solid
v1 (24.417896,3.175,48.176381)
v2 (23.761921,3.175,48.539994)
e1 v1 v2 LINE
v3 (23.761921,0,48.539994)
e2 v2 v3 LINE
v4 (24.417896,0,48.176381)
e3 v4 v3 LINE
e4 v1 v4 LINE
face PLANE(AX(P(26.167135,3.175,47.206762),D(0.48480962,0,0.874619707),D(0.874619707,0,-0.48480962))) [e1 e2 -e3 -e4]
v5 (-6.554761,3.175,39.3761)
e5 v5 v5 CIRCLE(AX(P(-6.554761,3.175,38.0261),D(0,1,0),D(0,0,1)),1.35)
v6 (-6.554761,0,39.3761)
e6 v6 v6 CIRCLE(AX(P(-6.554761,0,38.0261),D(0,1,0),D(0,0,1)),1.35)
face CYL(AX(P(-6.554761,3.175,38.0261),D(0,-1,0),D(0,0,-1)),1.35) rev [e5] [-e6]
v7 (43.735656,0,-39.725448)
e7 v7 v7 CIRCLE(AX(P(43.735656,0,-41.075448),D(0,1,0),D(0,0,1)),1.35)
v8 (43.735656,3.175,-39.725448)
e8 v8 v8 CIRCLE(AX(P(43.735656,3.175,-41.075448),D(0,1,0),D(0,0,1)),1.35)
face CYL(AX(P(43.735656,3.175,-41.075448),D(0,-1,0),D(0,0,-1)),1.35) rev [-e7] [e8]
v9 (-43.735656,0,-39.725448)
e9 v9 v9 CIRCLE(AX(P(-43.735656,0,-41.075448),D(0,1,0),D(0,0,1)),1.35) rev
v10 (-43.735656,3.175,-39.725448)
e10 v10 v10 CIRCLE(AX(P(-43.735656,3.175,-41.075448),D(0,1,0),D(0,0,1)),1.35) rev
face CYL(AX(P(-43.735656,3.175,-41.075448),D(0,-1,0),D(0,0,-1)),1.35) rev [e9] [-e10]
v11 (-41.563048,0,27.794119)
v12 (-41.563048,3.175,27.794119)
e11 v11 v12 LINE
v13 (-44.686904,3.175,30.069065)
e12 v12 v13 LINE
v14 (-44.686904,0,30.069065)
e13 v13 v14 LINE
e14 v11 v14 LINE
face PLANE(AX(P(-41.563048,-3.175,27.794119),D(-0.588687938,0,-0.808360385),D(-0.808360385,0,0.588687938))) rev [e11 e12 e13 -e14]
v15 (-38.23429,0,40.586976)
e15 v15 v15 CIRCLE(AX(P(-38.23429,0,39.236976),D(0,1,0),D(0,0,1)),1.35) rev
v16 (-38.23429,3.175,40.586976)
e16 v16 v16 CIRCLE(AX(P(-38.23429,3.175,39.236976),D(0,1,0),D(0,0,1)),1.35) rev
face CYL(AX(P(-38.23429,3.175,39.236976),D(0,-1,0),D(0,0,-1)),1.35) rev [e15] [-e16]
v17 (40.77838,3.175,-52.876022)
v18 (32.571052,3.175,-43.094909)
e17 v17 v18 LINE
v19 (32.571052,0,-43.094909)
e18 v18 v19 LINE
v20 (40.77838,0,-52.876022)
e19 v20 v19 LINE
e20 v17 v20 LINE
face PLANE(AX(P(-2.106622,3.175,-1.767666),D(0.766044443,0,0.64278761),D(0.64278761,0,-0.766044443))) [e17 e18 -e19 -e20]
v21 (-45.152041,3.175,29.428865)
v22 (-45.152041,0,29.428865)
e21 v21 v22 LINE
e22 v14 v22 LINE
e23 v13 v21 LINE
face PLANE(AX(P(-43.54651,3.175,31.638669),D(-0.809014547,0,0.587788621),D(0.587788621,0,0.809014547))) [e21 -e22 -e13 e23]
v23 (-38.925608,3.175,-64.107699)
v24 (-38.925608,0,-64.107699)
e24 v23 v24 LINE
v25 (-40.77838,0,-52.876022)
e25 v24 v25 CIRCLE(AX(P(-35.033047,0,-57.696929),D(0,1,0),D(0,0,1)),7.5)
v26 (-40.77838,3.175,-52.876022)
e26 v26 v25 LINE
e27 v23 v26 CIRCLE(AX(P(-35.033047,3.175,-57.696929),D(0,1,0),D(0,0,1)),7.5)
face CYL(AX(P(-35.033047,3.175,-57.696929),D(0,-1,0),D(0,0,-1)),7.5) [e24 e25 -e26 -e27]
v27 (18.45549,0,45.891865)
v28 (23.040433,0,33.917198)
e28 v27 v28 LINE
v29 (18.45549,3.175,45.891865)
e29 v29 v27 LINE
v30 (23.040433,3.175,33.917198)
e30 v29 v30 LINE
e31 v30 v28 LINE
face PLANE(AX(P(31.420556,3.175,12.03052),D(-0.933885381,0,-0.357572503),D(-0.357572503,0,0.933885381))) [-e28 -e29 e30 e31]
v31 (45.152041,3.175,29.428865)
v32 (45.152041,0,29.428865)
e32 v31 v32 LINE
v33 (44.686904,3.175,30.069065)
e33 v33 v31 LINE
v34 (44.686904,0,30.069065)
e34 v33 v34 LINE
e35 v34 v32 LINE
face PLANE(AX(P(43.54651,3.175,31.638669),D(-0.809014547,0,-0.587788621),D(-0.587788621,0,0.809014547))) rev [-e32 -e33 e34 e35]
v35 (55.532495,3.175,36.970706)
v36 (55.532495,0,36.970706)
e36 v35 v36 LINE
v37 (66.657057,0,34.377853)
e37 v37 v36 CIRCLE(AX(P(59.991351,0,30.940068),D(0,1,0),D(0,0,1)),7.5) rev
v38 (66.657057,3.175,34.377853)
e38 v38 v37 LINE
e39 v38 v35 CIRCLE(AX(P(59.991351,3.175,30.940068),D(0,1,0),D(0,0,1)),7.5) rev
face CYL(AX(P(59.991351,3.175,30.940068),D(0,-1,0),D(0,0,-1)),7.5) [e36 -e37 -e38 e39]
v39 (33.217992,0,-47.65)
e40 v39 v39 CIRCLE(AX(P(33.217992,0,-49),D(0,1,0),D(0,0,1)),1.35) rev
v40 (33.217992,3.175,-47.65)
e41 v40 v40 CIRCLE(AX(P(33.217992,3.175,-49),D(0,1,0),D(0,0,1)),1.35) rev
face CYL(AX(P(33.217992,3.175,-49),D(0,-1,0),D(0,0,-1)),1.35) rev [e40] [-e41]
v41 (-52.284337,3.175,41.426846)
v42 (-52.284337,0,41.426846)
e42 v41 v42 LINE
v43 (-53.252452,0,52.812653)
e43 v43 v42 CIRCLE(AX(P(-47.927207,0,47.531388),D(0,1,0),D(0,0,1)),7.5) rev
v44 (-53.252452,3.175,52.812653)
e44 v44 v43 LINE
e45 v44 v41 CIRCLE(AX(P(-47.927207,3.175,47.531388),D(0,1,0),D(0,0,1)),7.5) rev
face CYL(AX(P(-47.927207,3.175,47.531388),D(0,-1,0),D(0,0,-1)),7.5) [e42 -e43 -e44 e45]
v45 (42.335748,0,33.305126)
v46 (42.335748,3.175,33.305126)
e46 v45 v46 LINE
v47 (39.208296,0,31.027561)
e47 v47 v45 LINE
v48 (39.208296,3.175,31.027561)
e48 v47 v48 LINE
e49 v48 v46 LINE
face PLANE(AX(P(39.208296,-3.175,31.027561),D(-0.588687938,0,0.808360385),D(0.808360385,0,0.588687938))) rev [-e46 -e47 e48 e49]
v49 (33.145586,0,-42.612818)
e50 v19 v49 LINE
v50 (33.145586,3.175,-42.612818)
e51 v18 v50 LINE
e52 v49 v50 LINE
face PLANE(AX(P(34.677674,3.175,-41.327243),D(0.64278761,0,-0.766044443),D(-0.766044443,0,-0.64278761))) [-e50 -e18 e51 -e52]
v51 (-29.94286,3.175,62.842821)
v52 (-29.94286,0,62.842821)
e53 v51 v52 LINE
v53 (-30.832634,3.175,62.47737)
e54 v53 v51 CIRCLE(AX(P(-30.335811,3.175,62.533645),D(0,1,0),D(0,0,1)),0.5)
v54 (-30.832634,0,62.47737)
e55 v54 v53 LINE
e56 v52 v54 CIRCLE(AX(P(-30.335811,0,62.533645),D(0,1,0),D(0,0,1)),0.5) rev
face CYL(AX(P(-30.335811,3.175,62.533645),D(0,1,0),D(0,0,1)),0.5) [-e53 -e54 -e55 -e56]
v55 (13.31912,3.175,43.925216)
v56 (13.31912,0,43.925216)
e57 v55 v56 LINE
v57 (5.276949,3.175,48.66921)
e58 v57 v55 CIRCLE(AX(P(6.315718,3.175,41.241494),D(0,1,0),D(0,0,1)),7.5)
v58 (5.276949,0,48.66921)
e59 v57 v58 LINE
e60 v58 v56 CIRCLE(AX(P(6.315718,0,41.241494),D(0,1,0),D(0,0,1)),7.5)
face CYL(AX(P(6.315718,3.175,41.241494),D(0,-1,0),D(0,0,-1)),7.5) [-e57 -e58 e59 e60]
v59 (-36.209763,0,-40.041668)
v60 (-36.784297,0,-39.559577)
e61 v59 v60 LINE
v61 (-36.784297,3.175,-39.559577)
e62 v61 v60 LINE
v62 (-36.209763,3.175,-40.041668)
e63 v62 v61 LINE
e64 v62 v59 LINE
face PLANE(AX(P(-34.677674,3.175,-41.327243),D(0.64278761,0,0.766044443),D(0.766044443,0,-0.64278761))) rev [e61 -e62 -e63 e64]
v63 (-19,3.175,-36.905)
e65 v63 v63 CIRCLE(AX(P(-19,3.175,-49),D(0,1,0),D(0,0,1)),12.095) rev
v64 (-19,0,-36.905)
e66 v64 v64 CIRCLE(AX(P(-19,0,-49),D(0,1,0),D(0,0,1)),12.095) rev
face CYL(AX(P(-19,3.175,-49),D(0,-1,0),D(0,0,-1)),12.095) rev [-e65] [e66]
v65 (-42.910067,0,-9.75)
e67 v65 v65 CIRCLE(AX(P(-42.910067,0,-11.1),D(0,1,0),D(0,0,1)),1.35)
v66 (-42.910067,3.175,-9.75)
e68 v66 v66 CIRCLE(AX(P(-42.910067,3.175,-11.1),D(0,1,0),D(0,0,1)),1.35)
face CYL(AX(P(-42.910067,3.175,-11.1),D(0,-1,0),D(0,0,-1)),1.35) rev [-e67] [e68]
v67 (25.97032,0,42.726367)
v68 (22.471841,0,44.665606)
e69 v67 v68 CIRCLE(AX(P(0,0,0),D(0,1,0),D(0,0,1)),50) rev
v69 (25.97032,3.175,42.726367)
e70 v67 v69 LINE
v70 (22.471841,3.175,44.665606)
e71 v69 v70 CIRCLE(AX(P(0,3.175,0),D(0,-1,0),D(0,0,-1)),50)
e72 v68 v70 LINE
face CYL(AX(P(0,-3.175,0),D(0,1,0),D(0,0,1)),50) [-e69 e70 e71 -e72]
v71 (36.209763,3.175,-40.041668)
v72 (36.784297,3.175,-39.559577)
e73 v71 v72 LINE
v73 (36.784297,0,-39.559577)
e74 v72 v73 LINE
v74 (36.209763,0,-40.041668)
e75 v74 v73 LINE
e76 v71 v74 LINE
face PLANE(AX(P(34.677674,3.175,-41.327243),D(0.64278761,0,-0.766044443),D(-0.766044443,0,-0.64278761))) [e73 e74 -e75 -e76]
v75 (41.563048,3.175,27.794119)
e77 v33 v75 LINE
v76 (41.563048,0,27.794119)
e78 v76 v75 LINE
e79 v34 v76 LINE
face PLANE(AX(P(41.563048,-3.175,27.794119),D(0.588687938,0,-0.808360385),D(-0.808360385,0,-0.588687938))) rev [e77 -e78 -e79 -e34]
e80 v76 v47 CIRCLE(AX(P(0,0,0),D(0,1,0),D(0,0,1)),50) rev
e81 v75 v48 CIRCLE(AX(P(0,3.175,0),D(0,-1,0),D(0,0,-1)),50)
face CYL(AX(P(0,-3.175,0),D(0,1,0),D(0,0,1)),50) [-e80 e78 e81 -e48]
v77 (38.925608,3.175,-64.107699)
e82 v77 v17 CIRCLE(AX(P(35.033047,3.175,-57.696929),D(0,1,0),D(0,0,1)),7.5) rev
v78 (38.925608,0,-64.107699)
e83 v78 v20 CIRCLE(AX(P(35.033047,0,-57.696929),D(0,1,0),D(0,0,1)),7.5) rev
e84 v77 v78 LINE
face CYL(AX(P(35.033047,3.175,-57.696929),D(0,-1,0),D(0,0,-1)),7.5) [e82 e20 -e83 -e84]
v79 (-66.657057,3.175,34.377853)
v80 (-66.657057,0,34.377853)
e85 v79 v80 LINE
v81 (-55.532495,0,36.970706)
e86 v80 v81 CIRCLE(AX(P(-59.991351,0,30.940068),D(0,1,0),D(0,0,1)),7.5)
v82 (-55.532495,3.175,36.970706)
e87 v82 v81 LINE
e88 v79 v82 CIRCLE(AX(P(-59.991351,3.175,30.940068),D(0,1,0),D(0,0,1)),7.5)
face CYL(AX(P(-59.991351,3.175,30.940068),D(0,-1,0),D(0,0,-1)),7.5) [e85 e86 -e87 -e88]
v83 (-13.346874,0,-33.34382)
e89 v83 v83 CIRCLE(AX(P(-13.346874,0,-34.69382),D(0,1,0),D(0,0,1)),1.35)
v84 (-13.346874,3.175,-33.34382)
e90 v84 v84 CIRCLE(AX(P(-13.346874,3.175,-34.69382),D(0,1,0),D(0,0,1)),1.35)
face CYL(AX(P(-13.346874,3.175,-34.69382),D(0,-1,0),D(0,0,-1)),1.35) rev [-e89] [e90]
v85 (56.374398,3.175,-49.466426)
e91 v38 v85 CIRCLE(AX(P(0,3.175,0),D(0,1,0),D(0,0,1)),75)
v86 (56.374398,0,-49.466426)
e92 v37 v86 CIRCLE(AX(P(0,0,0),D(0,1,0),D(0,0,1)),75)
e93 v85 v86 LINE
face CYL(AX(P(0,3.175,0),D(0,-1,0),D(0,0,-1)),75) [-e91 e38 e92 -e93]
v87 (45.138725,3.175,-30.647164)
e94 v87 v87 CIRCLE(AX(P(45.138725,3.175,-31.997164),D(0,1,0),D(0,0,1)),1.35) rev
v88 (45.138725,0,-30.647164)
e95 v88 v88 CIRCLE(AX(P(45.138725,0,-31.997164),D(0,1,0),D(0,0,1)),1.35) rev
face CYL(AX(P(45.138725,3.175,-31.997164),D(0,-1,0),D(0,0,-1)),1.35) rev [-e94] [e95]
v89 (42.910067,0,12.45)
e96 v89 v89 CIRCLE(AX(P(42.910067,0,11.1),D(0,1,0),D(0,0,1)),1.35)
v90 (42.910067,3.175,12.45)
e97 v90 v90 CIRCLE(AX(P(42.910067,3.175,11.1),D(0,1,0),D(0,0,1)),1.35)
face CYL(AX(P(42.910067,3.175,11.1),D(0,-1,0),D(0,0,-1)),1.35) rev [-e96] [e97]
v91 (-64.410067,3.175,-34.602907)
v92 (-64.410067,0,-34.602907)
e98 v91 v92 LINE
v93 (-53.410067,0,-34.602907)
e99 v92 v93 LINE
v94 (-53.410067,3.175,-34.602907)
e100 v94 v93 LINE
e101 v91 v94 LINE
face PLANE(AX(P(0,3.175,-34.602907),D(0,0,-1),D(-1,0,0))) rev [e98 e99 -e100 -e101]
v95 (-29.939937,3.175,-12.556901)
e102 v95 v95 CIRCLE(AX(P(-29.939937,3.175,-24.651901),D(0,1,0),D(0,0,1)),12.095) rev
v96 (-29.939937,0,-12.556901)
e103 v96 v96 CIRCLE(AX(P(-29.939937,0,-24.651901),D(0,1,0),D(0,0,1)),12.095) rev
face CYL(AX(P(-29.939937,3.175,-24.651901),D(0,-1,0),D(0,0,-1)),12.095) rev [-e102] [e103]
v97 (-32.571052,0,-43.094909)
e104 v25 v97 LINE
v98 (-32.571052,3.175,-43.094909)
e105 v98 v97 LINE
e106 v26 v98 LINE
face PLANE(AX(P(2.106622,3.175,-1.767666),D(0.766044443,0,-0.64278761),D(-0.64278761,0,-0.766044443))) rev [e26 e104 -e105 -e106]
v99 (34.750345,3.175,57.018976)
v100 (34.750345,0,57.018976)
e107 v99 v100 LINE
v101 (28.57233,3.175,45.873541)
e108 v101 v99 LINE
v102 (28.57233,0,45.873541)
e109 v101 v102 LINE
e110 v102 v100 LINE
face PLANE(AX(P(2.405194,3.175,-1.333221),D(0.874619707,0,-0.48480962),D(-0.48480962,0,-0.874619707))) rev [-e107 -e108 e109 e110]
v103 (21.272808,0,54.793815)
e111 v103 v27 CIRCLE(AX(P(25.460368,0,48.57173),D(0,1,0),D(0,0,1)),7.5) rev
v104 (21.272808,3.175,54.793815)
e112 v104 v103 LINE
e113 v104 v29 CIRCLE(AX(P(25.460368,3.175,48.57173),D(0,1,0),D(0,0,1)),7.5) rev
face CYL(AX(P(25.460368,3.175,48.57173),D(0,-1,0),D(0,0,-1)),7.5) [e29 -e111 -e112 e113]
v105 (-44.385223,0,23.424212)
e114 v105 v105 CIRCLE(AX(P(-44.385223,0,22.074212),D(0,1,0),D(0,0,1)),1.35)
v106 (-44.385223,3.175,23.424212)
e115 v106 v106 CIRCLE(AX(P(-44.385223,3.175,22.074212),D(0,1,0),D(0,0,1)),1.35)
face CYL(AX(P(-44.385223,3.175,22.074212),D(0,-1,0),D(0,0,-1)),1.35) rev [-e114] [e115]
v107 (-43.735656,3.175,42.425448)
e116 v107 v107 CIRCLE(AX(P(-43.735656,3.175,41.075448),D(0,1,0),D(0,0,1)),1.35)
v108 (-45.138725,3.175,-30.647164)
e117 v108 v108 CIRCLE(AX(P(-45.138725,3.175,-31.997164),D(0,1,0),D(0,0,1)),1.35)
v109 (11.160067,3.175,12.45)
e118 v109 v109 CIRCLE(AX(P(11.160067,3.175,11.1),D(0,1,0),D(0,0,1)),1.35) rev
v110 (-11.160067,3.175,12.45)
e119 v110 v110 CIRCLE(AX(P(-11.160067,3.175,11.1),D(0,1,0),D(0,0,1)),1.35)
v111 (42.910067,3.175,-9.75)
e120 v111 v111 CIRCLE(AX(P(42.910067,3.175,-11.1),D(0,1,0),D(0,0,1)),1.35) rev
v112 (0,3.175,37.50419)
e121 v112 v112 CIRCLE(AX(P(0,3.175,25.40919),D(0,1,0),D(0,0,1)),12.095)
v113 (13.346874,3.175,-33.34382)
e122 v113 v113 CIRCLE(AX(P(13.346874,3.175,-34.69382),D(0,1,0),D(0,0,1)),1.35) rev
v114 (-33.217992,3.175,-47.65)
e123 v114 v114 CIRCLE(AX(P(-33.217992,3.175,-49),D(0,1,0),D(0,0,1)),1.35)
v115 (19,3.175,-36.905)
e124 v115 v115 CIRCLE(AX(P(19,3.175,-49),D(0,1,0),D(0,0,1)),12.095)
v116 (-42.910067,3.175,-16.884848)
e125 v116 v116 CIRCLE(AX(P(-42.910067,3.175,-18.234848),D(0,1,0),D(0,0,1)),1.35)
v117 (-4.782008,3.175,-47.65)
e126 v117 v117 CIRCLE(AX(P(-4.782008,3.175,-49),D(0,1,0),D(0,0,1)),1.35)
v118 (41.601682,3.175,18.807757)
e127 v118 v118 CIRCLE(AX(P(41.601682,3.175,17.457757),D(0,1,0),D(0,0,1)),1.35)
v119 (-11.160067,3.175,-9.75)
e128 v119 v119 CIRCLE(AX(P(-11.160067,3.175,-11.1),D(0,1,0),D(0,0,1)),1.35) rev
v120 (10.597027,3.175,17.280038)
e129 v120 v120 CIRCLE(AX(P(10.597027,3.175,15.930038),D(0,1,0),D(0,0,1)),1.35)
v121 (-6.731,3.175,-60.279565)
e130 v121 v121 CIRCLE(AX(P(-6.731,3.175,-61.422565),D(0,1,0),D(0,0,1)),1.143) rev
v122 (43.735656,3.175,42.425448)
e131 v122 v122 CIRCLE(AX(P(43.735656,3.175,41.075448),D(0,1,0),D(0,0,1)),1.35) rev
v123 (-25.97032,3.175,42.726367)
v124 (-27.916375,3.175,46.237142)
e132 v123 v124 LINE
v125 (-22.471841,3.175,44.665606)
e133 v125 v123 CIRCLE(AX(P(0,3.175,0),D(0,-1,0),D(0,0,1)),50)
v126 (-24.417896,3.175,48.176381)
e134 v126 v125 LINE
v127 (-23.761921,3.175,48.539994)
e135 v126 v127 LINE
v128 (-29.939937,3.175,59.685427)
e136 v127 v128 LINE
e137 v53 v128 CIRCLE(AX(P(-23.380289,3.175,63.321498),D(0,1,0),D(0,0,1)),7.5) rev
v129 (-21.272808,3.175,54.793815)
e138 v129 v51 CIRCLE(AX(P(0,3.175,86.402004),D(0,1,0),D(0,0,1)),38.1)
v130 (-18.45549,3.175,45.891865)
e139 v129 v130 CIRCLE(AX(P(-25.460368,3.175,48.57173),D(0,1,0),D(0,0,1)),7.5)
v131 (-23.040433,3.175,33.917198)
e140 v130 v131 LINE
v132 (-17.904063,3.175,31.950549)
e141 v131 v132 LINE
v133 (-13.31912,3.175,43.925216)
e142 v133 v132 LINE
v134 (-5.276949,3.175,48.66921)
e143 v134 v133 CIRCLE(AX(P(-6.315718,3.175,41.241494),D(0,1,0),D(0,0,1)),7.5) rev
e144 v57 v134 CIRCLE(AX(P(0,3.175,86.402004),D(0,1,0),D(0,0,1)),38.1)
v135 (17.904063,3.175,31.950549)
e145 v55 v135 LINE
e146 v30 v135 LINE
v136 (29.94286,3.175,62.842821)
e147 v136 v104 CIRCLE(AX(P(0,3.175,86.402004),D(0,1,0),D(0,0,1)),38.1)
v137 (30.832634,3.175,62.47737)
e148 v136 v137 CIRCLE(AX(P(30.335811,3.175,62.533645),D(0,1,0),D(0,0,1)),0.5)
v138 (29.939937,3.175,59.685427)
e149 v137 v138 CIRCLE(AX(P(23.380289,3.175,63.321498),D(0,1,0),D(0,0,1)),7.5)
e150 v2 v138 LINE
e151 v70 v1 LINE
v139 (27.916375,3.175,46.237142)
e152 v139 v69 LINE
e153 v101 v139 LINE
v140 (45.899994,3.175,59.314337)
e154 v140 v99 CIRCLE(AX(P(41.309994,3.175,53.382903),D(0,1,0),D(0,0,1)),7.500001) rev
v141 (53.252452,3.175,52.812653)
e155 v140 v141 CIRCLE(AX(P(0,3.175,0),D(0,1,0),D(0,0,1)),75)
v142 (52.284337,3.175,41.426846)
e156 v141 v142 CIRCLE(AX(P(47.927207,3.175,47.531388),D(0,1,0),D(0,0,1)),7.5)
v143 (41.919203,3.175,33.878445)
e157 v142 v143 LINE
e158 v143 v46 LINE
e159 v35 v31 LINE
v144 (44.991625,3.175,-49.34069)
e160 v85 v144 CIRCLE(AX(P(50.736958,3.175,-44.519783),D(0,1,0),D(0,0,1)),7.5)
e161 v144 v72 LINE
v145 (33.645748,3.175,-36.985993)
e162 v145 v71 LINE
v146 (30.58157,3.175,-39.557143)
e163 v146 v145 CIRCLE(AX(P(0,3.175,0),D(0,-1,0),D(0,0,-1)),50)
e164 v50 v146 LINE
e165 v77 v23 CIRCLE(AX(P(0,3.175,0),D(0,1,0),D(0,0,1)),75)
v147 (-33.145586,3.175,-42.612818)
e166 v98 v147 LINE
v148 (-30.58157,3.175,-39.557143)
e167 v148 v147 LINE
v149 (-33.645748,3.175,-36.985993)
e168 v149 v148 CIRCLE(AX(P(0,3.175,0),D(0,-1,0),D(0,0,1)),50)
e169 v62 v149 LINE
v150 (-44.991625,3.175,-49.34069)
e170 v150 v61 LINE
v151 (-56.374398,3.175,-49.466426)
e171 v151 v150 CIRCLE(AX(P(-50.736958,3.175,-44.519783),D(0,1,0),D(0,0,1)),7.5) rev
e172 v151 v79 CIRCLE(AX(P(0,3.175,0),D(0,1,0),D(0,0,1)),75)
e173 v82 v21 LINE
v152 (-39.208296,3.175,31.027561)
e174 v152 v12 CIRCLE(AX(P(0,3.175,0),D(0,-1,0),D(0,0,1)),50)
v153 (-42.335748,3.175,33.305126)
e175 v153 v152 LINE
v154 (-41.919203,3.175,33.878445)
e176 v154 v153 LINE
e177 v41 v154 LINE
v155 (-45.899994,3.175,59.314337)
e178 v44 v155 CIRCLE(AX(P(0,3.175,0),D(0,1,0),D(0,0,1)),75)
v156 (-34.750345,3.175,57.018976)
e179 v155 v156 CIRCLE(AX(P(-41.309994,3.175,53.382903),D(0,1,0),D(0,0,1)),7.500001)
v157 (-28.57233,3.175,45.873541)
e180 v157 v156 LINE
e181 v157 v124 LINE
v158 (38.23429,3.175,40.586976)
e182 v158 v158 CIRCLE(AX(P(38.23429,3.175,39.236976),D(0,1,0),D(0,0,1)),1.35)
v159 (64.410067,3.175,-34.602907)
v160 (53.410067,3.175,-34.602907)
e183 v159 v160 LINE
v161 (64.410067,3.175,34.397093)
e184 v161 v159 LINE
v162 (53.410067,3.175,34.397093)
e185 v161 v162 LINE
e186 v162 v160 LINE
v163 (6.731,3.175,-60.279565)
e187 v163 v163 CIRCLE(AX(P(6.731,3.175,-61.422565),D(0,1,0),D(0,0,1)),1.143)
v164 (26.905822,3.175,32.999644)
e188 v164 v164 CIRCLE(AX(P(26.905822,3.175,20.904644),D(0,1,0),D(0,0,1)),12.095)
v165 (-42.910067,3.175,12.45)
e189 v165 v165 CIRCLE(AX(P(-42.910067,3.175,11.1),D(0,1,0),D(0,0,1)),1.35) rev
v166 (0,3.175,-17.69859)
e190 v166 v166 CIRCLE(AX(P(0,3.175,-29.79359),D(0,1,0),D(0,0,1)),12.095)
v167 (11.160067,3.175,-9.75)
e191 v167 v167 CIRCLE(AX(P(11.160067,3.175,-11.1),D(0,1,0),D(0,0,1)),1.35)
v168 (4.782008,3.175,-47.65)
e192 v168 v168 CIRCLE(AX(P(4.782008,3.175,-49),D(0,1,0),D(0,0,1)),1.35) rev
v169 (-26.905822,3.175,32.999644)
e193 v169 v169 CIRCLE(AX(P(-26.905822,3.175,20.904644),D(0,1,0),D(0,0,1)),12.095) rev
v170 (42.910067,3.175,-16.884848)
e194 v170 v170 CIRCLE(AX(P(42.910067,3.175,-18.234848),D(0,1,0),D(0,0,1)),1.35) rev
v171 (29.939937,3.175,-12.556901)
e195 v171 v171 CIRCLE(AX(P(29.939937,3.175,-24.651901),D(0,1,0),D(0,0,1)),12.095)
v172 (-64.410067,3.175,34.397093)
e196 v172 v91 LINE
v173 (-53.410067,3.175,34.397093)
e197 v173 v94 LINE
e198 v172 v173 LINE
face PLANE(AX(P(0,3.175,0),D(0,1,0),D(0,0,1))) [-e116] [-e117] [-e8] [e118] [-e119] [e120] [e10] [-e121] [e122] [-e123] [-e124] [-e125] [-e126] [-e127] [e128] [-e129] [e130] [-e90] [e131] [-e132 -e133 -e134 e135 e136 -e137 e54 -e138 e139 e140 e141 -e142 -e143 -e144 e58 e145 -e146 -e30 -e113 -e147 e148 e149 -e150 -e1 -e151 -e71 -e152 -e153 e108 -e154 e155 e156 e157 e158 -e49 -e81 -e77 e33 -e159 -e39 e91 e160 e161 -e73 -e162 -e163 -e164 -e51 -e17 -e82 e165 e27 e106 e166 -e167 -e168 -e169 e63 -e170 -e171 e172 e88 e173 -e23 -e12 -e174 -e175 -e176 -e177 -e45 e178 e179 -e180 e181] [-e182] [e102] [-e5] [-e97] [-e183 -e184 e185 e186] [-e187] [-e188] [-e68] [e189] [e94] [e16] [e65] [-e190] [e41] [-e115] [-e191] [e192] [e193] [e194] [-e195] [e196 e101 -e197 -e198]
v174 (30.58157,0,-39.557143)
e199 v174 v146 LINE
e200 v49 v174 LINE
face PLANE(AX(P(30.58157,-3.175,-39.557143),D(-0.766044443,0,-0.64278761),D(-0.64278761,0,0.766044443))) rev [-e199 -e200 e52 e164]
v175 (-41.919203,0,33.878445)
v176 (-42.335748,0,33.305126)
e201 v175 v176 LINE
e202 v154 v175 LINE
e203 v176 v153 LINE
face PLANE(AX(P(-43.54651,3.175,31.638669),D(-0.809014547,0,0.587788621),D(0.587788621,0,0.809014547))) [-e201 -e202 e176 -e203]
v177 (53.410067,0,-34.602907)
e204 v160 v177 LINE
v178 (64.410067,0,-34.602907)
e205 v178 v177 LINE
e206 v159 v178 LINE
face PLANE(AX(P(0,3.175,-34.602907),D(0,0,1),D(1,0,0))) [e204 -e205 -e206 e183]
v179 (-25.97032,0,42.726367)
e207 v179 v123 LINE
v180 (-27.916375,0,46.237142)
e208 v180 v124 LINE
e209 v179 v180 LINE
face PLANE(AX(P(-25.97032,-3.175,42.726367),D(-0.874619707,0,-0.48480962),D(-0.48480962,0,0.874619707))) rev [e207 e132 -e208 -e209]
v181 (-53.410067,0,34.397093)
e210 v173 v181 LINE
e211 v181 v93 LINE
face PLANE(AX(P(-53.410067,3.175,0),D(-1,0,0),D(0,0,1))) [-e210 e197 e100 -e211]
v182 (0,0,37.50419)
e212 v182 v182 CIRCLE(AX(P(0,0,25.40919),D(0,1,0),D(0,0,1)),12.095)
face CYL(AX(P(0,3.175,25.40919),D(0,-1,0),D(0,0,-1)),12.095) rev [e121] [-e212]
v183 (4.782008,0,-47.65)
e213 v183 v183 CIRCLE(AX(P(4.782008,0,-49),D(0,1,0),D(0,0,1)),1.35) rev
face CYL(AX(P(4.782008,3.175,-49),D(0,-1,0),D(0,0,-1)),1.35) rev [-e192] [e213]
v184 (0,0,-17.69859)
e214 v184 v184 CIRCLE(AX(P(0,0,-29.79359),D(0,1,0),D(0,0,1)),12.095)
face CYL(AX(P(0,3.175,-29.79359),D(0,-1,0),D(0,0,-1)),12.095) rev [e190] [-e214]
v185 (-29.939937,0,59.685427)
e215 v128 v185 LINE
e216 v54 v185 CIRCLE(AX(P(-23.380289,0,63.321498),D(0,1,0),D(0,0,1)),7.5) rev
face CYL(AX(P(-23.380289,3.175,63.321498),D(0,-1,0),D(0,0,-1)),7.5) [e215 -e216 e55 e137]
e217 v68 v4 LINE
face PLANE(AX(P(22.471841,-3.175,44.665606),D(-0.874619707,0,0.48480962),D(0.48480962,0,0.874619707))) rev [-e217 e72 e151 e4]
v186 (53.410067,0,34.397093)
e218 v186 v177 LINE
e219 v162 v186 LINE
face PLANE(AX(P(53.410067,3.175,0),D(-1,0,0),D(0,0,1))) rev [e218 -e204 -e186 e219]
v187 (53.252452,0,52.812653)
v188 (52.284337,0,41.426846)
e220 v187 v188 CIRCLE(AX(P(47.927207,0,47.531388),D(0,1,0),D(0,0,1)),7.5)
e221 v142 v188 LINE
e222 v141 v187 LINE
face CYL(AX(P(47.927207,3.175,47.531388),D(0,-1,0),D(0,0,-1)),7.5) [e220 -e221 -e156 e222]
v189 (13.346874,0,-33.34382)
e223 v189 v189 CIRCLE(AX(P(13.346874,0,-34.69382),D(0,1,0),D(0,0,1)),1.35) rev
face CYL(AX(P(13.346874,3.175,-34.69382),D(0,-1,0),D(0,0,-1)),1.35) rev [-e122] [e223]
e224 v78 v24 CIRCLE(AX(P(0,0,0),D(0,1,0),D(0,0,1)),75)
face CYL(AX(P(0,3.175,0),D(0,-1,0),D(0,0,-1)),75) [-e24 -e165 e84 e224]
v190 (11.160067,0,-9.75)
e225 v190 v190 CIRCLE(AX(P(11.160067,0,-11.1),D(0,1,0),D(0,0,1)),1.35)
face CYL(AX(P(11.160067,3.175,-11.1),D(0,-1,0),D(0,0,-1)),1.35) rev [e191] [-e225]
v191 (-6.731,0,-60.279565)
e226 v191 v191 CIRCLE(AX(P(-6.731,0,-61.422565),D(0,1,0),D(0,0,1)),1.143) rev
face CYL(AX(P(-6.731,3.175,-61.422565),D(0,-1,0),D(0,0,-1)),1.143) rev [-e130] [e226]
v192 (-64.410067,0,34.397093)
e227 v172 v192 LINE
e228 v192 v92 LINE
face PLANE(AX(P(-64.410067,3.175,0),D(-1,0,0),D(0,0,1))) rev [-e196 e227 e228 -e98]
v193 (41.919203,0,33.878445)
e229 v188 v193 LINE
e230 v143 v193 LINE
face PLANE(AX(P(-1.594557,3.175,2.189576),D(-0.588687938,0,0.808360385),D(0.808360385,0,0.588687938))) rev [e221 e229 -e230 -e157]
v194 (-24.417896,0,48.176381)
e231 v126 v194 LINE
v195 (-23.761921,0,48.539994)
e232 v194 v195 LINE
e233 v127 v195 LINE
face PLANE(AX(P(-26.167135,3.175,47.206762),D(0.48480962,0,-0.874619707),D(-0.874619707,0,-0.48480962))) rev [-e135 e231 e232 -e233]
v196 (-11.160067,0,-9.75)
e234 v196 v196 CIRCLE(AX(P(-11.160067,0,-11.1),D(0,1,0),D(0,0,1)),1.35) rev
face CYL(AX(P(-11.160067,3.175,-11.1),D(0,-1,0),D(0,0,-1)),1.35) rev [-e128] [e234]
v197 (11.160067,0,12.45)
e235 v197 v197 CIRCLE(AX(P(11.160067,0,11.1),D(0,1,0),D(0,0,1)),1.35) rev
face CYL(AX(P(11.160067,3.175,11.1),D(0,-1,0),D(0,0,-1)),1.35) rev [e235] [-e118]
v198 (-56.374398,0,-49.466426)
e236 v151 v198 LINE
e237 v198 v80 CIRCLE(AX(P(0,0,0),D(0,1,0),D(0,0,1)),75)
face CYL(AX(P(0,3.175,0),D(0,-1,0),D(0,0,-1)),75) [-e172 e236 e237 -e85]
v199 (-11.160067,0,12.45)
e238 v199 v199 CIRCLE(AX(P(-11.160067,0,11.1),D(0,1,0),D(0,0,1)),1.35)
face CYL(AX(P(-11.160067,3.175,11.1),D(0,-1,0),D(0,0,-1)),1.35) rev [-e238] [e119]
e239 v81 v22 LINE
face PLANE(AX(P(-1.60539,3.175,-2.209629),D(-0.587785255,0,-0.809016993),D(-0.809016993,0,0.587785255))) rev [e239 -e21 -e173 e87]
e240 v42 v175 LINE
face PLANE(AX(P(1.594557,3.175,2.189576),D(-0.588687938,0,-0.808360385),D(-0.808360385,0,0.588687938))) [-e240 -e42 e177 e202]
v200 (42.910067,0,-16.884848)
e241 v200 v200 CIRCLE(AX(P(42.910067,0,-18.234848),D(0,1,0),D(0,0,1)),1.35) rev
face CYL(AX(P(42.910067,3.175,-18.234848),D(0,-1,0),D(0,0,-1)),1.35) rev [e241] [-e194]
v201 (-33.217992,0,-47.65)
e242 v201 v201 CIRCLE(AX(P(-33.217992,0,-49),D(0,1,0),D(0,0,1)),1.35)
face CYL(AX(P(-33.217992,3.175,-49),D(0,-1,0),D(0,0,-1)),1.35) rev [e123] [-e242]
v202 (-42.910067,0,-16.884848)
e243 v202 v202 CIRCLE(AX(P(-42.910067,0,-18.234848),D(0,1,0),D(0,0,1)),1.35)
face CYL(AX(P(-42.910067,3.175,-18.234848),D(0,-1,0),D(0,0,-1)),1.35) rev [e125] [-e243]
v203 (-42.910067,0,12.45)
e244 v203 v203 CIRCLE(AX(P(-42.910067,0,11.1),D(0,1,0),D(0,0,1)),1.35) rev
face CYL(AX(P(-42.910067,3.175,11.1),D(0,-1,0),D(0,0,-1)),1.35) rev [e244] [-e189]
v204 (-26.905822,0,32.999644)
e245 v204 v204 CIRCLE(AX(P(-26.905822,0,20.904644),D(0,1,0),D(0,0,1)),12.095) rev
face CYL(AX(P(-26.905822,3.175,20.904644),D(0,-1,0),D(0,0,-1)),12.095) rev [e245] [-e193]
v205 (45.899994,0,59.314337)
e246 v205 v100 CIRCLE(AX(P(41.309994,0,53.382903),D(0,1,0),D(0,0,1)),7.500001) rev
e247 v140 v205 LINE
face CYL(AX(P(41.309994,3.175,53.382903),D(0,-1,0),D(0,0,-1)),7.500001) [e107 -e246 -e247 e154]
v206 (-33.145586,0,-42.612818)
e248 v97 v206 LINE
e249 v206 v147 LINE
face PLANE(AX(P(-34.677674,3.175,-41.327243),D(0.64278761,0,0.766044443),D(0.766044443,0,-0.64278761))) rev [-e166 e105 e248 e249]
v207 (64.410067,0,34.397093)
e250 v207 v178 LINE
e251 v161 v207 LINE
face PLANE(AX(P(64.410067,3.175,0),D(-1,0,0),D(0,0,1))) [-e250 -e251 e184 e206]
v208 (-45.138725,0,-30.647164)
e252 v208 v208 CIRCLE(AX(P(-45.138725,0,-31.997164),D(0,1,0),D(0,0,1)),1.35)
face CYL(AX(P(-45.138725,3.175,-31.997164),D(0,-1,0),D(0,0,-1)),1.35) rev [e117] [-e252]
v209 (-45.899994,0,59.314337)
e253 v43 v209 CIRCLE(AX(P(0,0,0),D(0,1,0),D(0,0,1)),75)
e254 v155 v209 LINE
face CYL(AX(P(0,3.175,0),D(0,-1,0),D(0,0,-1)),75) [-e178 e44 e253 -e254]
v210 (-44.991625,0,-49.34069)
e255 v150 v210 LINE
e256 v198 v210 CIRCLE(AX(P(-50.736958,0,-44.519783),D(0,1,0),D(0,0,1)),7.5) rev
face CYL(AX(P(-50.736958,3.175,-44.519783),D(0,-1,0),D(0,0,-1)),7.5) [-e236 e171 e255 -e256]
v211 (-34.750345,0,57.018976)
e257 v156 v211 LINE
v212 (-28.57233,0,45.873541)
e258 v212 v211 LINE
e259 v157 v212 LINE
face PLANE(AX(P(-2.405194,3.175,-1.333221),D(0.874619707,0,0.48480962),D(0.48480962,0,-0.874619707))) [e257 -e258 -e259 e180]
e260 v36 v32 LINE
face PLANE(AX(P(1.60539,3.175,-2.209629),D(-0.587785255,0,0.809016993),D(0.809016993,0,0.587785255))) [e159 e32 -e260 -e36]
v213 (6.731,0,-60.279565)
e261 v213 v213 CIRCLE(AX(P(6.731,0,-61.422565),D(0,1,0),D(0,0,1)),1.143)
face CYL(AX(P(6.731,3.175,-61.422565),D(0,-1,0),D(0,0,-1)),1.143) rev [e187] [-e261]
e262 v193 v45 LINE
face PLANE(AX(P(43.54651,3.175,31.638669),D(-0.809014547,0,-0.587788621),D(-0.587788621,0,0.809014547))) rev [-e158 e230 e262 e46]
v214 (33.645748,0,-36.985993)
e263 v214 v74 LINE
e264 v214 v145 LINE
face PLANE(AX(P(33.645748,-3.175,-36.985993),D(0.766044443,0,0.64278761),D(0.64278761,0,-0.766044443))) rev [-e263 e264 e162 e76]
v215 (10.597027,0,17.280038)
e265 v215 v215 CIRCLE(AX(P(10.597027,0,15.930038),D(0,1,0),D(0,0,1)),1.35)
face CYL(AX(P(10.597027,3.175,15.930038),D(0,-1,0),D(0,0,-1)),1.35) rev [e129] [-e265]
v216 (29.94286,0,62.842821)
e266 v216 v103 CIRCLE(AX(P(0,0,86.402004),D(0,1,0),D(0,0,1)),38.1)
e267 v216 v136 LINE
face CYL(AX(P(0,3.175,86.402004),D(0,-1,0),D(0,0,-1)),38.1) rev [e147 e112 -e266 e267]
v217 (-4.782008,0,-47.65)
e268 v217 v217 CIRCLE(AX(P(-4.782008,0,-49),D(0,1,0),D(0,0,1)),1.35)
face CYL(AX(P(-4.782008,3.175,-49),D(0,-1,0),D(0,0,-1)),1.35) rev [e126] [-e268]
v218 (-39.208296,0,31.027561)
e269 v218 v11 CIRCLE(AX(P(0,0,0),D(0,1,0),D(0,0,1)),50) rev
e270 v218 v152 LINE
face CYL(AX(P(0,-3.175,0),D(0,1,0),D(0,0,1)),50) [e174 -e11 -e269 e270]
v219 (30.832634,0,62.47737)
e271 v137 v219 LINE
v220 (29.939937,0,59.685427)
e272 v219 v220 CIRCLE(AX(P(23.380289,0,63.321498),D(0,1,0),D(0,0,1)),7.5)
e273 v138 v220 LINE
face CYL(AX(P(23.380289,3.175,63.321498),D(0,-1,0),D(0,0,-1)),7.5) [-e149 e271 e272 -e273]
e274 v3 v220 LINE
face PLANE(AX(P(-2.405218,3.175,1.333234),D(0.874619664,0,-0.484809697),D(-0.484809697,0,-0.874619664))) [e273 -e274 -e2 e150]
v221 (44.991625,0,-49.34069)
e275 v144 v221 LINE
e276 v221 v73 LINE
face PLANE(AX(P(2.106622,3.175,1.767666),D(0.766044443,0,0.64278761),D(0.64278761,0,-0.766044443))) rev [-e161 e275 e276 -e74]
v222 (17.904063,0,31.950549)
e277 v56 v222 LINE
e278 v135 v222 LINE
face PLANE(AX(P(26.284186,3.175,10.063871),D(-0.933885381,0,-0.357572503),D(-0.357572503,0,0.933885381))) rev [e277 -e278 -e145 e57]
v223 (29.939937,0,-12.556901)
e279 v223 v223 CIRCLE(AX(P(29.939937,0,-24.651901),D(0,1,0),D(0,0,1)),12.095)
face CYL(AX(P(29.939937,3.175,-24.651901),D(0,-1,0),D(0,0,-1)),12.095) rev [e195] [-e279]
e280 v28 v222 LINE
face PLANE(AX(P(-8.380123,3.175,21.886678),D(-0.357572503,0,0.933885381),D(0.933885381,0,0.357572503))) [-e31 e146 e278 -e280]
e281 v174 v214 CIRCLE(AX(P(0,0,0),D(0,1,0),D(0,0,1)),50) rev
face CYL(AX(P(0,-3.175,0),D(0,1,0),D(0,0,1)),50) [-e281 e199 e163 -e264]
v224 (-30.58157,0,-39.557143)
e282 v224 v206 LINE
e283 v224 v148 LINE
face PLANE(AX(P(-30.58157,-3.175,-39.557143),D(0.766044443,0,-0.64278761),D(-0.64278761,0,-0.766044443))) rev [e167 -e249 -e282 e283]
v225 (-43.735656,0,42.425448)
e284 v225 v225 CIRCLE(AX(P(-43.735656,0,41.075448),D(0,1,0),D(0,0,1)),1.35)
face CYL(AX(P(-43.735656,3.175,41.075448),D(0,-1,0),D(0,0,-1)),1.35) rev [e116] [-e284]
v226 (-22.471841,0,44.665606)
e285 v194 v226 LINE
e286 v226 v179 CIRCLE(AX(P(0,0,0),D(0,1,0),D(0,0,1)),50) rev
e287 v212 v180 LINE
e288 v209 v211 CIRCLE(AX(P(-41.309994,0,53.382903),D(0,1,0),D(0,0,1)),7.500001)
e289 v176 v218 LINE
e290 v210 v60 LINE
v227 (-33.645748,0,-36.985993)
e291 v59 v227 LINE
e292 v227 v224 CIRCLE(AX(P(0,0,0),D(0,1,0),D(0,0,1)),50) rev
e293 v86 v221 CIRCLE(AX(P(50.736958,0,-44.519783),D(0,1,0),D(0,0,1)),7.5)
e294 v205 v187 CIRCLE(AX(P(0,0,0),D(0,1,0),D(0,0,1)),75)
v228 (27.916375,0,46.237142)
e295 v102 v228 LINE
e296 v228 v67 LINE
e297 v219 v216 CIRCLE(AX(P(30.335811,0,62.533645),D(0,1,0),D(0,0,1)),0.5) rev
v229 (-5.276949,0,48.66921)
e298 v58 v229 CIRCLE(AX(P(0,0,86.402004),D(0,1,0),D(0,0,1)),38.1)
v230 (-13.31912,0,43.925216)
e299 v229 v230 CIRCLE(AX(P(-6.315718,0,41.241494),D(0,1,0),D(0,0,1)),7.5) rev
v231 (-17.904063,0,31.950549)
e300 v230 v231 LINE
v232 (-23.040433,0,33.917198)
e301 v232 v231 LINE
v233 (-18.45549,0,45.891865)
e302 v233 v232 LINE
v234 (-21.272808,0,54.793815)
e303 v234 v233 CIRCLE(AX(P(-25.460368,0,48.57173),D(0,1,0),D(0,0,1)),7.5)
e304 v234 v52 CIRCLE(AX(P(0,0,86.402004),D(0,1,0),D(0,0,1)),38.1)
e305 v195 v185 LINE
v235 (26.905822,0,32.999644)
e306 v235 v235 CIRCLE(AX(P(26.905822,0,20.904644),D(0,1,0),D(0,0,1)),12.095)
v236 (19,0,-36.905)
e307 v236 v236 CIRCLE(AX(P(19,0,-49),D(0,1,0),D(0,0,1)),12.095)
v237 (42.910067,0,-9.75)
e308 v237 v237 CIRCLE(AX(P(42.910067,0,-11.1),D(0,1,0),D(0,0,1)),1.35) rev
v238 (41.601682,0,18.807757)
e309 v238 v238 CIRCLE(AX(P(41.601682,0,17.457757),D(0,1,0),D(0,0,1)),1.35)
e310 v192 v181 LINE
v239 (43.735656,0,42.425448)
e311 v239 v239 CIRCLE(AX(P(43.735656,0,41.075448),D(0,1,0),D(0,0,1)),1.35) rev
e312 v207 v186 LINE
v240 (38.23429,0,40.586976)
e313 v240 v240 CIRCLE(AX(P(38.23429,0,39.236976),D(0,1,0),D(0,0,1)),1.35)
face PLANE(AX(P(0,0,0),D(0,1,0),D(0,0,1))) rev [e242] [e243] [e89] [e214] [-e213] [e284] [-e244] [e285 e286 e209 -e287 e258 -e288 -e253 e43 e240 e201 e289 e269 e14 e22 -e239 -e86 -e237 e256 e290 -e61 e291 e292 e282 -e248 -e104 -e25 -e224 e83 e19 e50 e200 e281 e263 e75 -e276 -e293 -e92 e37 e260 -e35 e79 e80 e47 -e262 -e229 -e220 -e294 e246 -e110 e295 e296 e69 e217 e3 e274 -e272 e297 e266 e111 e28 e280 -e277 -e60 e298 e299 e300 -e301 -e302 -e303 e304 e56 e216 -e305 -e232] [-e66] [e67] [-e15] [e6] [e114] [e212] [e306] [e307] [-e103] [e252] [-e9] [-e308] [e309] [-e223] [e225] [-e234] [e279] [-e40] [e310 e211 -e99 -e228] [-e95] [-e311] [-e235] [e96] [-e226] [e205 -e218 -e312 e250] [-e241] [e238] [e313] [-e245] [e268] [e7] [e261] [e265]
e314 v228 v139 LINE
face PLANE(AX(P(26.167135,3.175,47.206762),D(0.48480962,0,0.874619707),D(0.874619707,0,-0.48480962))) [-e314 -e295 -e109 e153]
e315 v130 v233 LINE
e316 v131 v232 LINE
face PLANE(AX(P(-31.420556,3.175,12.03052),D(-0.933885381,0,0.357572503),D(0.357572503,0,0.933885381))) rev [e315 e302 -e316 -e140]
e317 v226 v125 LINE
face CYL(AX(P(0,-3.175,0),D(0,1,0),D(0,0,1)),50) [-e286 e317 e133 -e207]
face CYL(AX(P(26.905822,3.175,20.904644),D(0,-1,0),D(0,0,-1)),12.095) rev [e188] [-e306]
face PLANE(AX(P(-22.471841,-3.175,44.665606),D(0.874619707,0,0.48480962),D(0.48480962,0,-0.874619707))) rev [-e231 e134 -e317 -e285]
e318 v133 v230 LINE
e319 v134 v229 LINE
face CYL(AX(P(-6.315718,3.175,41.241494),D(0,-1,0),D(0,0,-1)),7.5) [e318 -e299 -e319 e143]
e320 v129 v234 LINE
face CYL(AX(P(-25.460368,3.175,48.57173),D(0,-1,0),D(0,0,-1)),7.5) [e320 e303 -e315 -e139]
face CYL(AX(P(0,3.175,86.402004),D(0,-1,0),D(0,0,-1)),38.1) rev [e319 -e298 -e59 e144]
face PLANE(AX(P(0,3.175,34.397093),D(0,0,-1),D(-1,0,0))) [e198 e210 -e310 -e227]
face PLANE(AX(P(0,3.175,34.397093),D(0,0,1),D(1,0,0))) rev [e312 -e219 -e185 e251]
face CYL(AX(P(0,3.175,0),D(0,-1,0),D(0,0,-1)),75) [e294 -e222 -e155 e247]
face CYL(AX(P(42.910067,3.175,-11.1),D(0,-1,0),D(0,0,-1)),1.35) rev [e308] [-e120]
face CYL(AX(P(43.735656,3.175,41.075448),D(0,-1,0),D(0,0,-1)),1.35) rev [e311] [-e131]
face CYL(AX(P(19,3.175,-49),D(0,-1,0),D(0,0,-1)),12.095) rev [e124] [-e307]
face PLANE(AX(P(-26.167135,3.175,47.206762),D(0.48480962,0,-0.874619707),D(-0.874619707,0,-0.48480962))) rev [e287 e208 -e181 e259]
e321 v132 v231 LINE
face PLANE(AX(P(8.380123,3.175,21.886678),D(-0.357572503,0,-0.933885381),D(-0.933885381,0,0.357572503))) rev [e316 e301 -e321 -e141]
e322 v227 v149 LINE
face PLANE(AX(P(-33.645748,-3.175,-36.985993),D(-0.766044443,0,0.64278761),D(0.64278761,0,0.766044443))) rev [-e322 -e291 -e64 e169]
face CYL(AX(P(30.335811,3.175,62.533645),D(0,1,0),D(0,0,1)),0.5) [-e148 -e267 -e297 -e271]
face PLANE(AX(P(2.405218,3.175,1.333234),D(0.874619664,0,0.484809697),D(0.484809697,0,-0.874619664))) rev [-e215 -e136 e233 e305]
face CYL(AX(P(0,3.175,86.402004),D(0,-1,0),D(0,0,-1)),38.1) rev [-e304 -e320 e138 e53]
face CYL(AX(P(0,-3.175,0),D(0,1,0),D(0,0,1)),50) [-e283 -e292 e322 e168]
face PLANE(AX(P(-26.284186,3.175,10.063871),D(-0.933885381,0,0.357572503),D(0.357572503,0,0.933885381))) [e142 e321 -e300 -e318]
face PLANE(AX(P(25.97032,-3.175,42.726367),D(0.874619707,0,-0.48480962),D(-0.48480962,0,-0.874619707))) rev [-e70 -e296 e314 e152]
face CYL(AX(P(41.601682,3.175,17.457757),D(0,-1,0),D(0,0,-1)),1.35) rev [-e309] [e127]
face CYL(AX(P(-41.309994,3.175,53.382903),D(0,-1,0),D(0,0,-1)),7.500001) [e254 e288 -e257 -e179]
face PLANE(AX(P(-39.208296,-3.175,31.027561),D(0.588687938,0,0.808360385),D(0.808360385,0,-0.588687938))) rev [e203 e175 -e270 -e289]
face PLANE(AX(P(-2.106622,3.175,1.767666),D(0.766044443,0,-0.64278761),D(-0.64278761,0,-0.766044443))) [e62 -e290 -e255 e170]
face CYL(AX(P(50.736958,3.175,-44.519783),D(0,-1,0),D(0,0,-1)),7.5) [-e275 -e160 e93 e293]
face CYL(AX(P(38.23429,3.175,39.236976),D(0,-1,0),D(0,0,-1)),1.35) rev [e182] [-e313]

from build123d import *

# Parameters (mm, degrees)
BOSS_EXTRUDE2_OUTLINE_R   = 1.35
BOSS_EXTRUDE2_OUTLINE_W   = 11
BOSS_EXTRUDE2_OUTLINE_H   = 69
BOSS_EXTRUDE2_OUTLINE_R_2 = 12.095
BOSS_EXTRUDE2_OUTLINE_R_3 = 1.143
BOSS_EXTRUDE2_DEPTH       = 3.175
CUT_EXTRUDE1_DEPTH        = 6.35
FILLET1_R                 = 0.5


# Read off the part's stored shape, not the designer's step: Boss-Extrude2
with BuildPart() as part:
    # Boss-Extrude2 outline → Boss-Extrude2 (new body)
    with BuildSketch(Plane(origin=(0, 0, 0), x_dir=(1, 0, 0), z_dir=(0, 1, 0))):
        with BuildLine():
            ThreePointArc((-13.319120077, -43.925216134), (-10.126305957, -47.701325441), (-5.276948898, -48.669209533))
            ThreePointArc((-5.276948898, -48.669209533), (0, -48.302004425), (5.276948898, -48.669209533))
            ThreePointArc((5.276948898, -48.669209533), (10.126305957, -47.701325441), (13.319120077, -43.925216134))
            Line((13.319120077, -43.925216134), (17.904063474, -31.950549264))
            Line((17.904063474, -31.950549264), (23.040433069, -33.917198033))
            Line((23.040433069, -33.917198033), (18.455489673, -45.891864903))
            ThreePointArc((18.455489673, -45.891864903), (18.309924074, -50.834725832), (21.272807595, -54.79381471))
            ThreePointArc((21.272807595, -54.79381471), (26.466137741, -58.99482374), (30.845959646, -64.038266509))
            ThreePointArc((30.845959646, -64.038266509), (30.722917613, -61.793165345), (29.939937248, -59.685427143))
            Line((29.939937248, -59.685427143), (23.761921217, -48.539993511))
            Line((23.761921217, -48.539993511), (28.572329606, -45.873540599))
            Line((28.572329606, -45.873540599), (34.750345491, -57.018976288))
            ThreePointArc((34.750345491, -57.018976288), (39.797694407, -60.728851606), (45.899993549, -59.314337155))
            ThreePointArc((45.899993549, -59.314337155), (49.682691748, -56.183895741), (53.252452412, -52.812652955))
            ThreePointArc((53.252452412, -52.812652955), (55.400241506, -46.895968251), (52.284336639, -41.426846498))
            Line((52.284336639, -41.426846498), (41.919203487, -33.87844485))
            Line((41.919203487, -33.87844485), (45.152040904, -29.428864843))
            Line((45.152040904, -29.428864843), (55.532494673, -36.970706015))
            ThreePointArc((55.532494673, -36.970706015), (61.693781059, -38.244294688), (66.657056834, -34.377852961))
            ThreePointArc((66.657056834, -34.377852961), (74.442262703, 9.129596032), (56.374397975, 49.466425512))
            ThreePointArc((56.374397975, 49.466425512), (50.654117331, 52.01932544), (44.991624855, 49.340690033))
            Line((44.991624855, 49.340690033), (36.78429665, 39.55957716))
            Line((36.78429665, 39.55957716), (32.571052213, 43.094909013))
            Line((32.571052213, 43.094909013), (40.778380417, 52.876021886))
            ThreePointArc((40.778380417, 52.876021886), (42.433039833, 58.917628535), (38.925607882, 64.107698843))
            ThreePointArc((38.925607882, 64.107698843), (0, 75), (-38.925607882, 64.107698843))
            ThreePointArc((-38.925607882, 64.107698843), (-42.433039833, 58.917628535), (-40.778380417, 52.876021886))
            Line((-40.778380417, 52.876021886), (-32.571052213, 43.094909013))
            Line((-32.571052213, 43.094909013), (-36.78429665, 39.55957716))
            Line((-36.78429665, 39.55957716), (-44.991624855, 49.340690033))
            ThreePointArc((-44.991624855, 49.340690033), (-50.654117331, 52.01932544), (-56.374397975, 49.466425512))
            ThreePointArc((-56.374397975, 49.466425512), (-74.442262703, 9.129596032), (-66.657056834, -34.377852961))
            ThreePointArc((-66.657056834, -34.377852961), (-61.693781059, -38.244294688), (-55.532494673, -36.970706015))
            Line((-55.532494673, -36.970706015), (-45.152040904, -29.428864843))
            Line((-45.152040904, -29.428864843), (-41.919203487, -33.87844485))
            Line((-41.919203487, -33.87844485), (-52.284336639, -41.426846498))
            ThreePointArc((-52.284336639, -41.426846498), (-55.400241506, -46.895968251), (-53.252452412, -52.812652955))
            ThreePointArc((-53.252452412, -52.812652955), (-49.682691748, -56.183895741), (-45.899993549, -59.314337155))
            ThreePointArc((-45.899993549, -59.314337155), (-39.797694407, -60.728851606), (-34.750345491, -57.018976288))
            Line((-34.750345491, -57.018976288), (-28.572329606, -45.873540599))
            Line((-28.572329606, -45.873540599), (-23.761921217, -48.539993511))
            Line((-23.761921217, -48.539993511), (-29.939937248, -59.685427143))
            ThreePointArc((-29.939937248, -59.685427143), (-30.722917613, -61.793165345), (-30.845959646, -64.038266509))
            ThreePointArc((-30.845959646, -64.038266509), (-26.466137741, -58.99482374), (-21.272807595, -54.79381471))
            ThreePointArc((-21.272807595, -54.79381471), (-18.309924074, -50.834725832), (-18.455489673, -45.891864903))
            Line((-18.455489673, -45.891864903), (-23.040433069, -33.917198033))
            Line((-23.040433069, -33.917198033), (-17.904063474, -31.950549264))
            Line((-17.904063474, -31.950549264), (-13.319120077, -43.925216134))
        make_face()
        with Locations((-43.735655662, -41.075447944)):
            Circle(BOSS_EXTRUDE2_OUTLINE_R, mode=Mode.SUBTRACT)
        with Locations((-38.234289702, -39.23697625)):
            Circle(BOSS_EXTRUDE2_OUTLINE_R, mode=Mode.SUBTRACT)
        with Locations((-6.55476095, -38.026099982)):
            Circle(BOSS_EXTRUDE2_OUTLINE_R, mode=Mode.SUBTRACT)
        with Locations((-44.385223141, -22.074211772)):
            Circle(BOSS_EXTRUDE2_OUTLINE_R, mode=Mode.SUBTRACT)
        with Locations((-58.910067426, 0.102907352)):
            Rectangle(BOSS_EXTRUDE2_OUTLINE_W, BOSS_EXTRUDE2_OUTLINE_H, mode=Mode.SUBTRACT)
        with Locations((-42.910067426, -11.1)):
            Circle(BOSS_EXTRUDE2_OUTLINE_R, mode=Mode.SUBTRACT)
        with Locations((-26.905821676, -20.904643604)):
            Circle(BOSS_EXTRUDE2_OUTLINE_R_2, mode=Mode.SUBTRACT)
        with Locations((-11.160067426, -11.1)):
            Circle(BOSS_EXTRUDE2_OUTLINE_R, mode=Mode.SUBTRACT)
        with Locations((38.234289702, -39.23697625)):
            Circle(BOSS_EXTRUDE2_OUTLINE_R, mode=Mode.SUBTRACT)
        with Locations((43.735655662, -41.075447944)):
            Circle(BOSS_EXTRUDE2_OUTLINE_R, mode=Mode.SUBTRACT)
        with Locations((0, -25.409190322)):
            Circle(BOSS_EXTRUDE2_OUTLINE_R_2, mode=Mode.SUBTRACT)
        with Locations((10.597026674, -15.930038136)):
            Circle(BOSS_EXTRUDE2_OUTLINE_R, mode=Mode.SUBTRACT)
        with Locations((26.905821676, -20.904643604)):
            Circle(BOSS_EXTRUDE2_OUTLINE_R_2, mode=Mode.SUBTRACT)
        with Locations((11.160067426, -11.1)):
            Circle(BOSS_EXTRUDE2_OUTLINE_R, mode=Mode.SUBTRACT)
        with Locations((41.601681906, -17.457756634)):
            Circle(BOSS_EXTRUDE2_OUTLINE_R, mode=Mode.SUBTRACT)
        with Locations((42.910067426, -11.1)):
            Circle(BOSS_EXTRUDE2_OUTLINE_R, mode=Mode.SUBTRACT)
        with Locations((58.910067426, 0.102907352)):
            Rectangle(BOSS_EXTRUDE2_OUTLINE_W, BOSS_EXTRUDE2_OUTLINE_H, mode=Mode.SUBTRACT)
        with Locations((-42.910067426, 11.1)):
            Circle(BOSS_EXTRUDE2_OUTLINE_R, mode=Mode.SUBTRACT)
        with Locations((-42.910067426, 18.234848025)):
            Circle(BOSS_EXTRUDE2_OUTLINE_R, mode=Mode.SUBTRACT)
        with Locations((-45.13872464, 31.997163897)):
            Circle(BOSS_EXTRUDE2_OUTLINE_R, mode=Mode.SUBTRACT)
        with Locations((-11.160067426, 11.1)):
            Circle(BOSS_EXTRUDE2_OUTLINE_R, mode=Mode.SUBTRACT)
        with Locations((-29.939937248, 24.651901309)):
            Circle(BOSS_EXTRUDE2_OUTLINE_R_2, mode=Mode.SUBTRACT)
        with Locations((-13.346873881, 34.693819966)):
            Circle(BOSS_EXTRUDE2_OUTLINE_R, mode=Mode.SUBTRACT)
        with Locations((-43.735655662, 41.075447944)):
            Circle(BOSS_EXTRUDE2_OUTLINE_R, mode=Mode.SUBTRACT)
        with Locations((-33.21799214, 49)):
            Circle(BOSS_EXTRUDE2_OUTLINE_R, mode=Mode.SUBTRACT)
        with Locations((-19, 49)):
            Circle(BOSS_EXTRUDE2_OUTLINE_R_2, mode=Mode.SUBTRACT)
        with Locations((-4.78200786, 49)):
            Circle(BOSS_EXTRUDE2_OUTLINE_R, mode=Mode.SUBTRACT)
        with Locations((-6.731, 61.422565207)):
            Circle(BOSS_EXTRUDE2_OUTLINE_R_3, mode=Mode.SUBTRACT)
        with Locations((11.160067426, 11.1)):
            Circle(BOSS_EXTRUDE2_OUTLINE_R, mode=Mode.SUBTRACT)
        with Locations((0, 29.793589551)):
            Circle(BOSS_EXTRUDE2_OUTLINE_R_2, mode=Mode.SUBTRACT)
        with Locations((13.346873881, 34.693819966)):
            Circle(BOSS_EXTRUDE2_OUTLINE_R, mode=Mode.SUBTRACT)
        with Locations((29.939937248, 24.651901309)):
            Circle(BOSS_EXTRUDE2_OUTLINE_R_2, mode=Mode.SUBTRACT)
        with Locations((42.910067426, 11.1)):
            Circle(BOSS_EXTRUDE2_OUTLINE_R, mode=Mode.SUBTRACT)
        with Locations((42.910067426, 18.234848025)):
            Circle(BOSS_EXTRUDE2_OUTLINE_R, mode=Mode.SUBTRACT)
        with Locations((45.13872464, 31.997163897)):
            Circle(BOSS_EXTRUDE2_OUTLINE_R, mode=Mode.SUBTRACT)
        with Locations((4.78200786, 49)):
            Circle(BOSS_EXTRUDE2_OUTLINE_R, mode=Mode.SUBTRACT)
        with Locations((19, 49)):
            Circle(BOSS_EXTRUDE2_OUTLINE_R_2, mode=Mode.SUBTRACT)
        with Locations((33.21799214, 49)):
            Circle(BOSS_EXTRUDE2_OUTLINE_R, mode=Mode.SUBTRACT)
        with Locations((6.731, 61.422565207)):
            Circle(BOSS_EXTRUDE2_OUTLINE_R_3, mode=Mode.SUBTRACT)
        with Locations((43.735655662, 41.075447944)):
            Circle(BOSS_EXTRUDE2_OUTLINE_R, mode=Mode.SUBTRACT)
    extrude(amount=BOSS_EXTRUDE2_DEPTH)

    # Sketch3 → Cut-Extrude1 (cut)
    with BuildSketch(Plane(origin=(0, 3.175, 0), x_dir=(1, 0, 0), z_dir=(0, 1, 0))):
        with BuildLine():
            Line((-30.581569801, 39.557143331), (-34.365473638, 44.066624323))
            ThreePointArc((-34.365473638, 44.066624323), (-35.920574868, 42.808474147), (-37.42965141, 41.495473884))
            Line((-37.42965141, 41.495473884), (-33.645747573, 36.985992892))
            ThreePointArc((-33.645747573, 36.985992892), (-32.139380484, 38.302222156), (-30.581569801, 39.557143331))
        make_face()
        with BuildLine():
            Line((-41.563047759, -27.79411918), (-46.321630401, -31.259553973))
            ThreePointArc((-46.321630401, -31.259553973), (-45.173194515, -32.897350272), (-43.966878649, -34.492995513))
            Line((-43.966878649, -34.492995513), (-39.208296007, -31.02756072))
            ThreePointArc((-39.208296007, -31.02756072), (-40.418019242, -29.434396894), (-41.563047759, -27.79411918))
        make_face()
        with BuildLine():
            Line((-22.47184145, -44.665605804), (-25.325774778, -49.814237819))
            ThreePointArc((-25.325774778, -49.814237819), (-27.09237079, -48.875930708), (-28.824253607, -47.874999338))
            Line((-28.824253607, -47.874999338), (-25.970320279, -42.726367323))
            ThreePointArc((-25.970320279, -42.726367323), (-24.240481012, -43.730985357), (-22.47184145, -44.665605804))
        make_face()
        with BuildLine():
            Line((25.970320279, -42.726367323), (28.824253607, -47.874999338))
            ThreePointArc((28.824253607, -47.874999338), (27.09237079, -48.875930708), (25.325774778, -49.814237819))
            Line((25.325774778, -49.814237819), (22.47184145, -44.665605804))
            ThreePointArc((22.47184145, -44.665605804), (24.240481012, -43.730985357), (25.970320279, -42.726367323))
        make_face()
        with BuildLine():
            Line((39.208296007, -31.02756072), (43.966878649, -34.492995513))
            ThreePointArc((43.966878649, -34.492995513), (45.173194515, -32.897350272), (46.321630401, -31.259553973))
            Line((46.321630401, -31.259553973), (41.563047759, -27.79411918))
            ThreePointArc((41.563047759, -27.79411918), (40.418019242, -29.434396894), (39.208296007, -31.02756072))
        make_face()
        with BuildLine():
            Line((33.645747573, 36.985992892), (37.42965141, 41.495473884))
            ThreePointArc((37.42965141, 41.495473884), (35.920574868, 42.808474147), (34.365473638, 44.066624323))
            Line((34.365473638, 44.066624323), (30.581569801, 39.557143331))
            ThreePointArc((30.581569801, 39.557143331), (32.139380484, 38.302222156), (33.645747573, 36.985992892))
        make_face()
    extrude(amount=-CUT_EXTRUDE1_DEPTH, mode=Mode.SUBTRACT)

    # Fillet1
    fillet1_edges = [part.edges().sort_by_distance(p)[0] for p in [
        (-30.845959646, 1.5875, 64.038266509),
        (30.845959646, 1.5875, 64.038266509),
    ]]
    fillet(fillet1_edges, radius=FILLET1_R)


solid = part.part
